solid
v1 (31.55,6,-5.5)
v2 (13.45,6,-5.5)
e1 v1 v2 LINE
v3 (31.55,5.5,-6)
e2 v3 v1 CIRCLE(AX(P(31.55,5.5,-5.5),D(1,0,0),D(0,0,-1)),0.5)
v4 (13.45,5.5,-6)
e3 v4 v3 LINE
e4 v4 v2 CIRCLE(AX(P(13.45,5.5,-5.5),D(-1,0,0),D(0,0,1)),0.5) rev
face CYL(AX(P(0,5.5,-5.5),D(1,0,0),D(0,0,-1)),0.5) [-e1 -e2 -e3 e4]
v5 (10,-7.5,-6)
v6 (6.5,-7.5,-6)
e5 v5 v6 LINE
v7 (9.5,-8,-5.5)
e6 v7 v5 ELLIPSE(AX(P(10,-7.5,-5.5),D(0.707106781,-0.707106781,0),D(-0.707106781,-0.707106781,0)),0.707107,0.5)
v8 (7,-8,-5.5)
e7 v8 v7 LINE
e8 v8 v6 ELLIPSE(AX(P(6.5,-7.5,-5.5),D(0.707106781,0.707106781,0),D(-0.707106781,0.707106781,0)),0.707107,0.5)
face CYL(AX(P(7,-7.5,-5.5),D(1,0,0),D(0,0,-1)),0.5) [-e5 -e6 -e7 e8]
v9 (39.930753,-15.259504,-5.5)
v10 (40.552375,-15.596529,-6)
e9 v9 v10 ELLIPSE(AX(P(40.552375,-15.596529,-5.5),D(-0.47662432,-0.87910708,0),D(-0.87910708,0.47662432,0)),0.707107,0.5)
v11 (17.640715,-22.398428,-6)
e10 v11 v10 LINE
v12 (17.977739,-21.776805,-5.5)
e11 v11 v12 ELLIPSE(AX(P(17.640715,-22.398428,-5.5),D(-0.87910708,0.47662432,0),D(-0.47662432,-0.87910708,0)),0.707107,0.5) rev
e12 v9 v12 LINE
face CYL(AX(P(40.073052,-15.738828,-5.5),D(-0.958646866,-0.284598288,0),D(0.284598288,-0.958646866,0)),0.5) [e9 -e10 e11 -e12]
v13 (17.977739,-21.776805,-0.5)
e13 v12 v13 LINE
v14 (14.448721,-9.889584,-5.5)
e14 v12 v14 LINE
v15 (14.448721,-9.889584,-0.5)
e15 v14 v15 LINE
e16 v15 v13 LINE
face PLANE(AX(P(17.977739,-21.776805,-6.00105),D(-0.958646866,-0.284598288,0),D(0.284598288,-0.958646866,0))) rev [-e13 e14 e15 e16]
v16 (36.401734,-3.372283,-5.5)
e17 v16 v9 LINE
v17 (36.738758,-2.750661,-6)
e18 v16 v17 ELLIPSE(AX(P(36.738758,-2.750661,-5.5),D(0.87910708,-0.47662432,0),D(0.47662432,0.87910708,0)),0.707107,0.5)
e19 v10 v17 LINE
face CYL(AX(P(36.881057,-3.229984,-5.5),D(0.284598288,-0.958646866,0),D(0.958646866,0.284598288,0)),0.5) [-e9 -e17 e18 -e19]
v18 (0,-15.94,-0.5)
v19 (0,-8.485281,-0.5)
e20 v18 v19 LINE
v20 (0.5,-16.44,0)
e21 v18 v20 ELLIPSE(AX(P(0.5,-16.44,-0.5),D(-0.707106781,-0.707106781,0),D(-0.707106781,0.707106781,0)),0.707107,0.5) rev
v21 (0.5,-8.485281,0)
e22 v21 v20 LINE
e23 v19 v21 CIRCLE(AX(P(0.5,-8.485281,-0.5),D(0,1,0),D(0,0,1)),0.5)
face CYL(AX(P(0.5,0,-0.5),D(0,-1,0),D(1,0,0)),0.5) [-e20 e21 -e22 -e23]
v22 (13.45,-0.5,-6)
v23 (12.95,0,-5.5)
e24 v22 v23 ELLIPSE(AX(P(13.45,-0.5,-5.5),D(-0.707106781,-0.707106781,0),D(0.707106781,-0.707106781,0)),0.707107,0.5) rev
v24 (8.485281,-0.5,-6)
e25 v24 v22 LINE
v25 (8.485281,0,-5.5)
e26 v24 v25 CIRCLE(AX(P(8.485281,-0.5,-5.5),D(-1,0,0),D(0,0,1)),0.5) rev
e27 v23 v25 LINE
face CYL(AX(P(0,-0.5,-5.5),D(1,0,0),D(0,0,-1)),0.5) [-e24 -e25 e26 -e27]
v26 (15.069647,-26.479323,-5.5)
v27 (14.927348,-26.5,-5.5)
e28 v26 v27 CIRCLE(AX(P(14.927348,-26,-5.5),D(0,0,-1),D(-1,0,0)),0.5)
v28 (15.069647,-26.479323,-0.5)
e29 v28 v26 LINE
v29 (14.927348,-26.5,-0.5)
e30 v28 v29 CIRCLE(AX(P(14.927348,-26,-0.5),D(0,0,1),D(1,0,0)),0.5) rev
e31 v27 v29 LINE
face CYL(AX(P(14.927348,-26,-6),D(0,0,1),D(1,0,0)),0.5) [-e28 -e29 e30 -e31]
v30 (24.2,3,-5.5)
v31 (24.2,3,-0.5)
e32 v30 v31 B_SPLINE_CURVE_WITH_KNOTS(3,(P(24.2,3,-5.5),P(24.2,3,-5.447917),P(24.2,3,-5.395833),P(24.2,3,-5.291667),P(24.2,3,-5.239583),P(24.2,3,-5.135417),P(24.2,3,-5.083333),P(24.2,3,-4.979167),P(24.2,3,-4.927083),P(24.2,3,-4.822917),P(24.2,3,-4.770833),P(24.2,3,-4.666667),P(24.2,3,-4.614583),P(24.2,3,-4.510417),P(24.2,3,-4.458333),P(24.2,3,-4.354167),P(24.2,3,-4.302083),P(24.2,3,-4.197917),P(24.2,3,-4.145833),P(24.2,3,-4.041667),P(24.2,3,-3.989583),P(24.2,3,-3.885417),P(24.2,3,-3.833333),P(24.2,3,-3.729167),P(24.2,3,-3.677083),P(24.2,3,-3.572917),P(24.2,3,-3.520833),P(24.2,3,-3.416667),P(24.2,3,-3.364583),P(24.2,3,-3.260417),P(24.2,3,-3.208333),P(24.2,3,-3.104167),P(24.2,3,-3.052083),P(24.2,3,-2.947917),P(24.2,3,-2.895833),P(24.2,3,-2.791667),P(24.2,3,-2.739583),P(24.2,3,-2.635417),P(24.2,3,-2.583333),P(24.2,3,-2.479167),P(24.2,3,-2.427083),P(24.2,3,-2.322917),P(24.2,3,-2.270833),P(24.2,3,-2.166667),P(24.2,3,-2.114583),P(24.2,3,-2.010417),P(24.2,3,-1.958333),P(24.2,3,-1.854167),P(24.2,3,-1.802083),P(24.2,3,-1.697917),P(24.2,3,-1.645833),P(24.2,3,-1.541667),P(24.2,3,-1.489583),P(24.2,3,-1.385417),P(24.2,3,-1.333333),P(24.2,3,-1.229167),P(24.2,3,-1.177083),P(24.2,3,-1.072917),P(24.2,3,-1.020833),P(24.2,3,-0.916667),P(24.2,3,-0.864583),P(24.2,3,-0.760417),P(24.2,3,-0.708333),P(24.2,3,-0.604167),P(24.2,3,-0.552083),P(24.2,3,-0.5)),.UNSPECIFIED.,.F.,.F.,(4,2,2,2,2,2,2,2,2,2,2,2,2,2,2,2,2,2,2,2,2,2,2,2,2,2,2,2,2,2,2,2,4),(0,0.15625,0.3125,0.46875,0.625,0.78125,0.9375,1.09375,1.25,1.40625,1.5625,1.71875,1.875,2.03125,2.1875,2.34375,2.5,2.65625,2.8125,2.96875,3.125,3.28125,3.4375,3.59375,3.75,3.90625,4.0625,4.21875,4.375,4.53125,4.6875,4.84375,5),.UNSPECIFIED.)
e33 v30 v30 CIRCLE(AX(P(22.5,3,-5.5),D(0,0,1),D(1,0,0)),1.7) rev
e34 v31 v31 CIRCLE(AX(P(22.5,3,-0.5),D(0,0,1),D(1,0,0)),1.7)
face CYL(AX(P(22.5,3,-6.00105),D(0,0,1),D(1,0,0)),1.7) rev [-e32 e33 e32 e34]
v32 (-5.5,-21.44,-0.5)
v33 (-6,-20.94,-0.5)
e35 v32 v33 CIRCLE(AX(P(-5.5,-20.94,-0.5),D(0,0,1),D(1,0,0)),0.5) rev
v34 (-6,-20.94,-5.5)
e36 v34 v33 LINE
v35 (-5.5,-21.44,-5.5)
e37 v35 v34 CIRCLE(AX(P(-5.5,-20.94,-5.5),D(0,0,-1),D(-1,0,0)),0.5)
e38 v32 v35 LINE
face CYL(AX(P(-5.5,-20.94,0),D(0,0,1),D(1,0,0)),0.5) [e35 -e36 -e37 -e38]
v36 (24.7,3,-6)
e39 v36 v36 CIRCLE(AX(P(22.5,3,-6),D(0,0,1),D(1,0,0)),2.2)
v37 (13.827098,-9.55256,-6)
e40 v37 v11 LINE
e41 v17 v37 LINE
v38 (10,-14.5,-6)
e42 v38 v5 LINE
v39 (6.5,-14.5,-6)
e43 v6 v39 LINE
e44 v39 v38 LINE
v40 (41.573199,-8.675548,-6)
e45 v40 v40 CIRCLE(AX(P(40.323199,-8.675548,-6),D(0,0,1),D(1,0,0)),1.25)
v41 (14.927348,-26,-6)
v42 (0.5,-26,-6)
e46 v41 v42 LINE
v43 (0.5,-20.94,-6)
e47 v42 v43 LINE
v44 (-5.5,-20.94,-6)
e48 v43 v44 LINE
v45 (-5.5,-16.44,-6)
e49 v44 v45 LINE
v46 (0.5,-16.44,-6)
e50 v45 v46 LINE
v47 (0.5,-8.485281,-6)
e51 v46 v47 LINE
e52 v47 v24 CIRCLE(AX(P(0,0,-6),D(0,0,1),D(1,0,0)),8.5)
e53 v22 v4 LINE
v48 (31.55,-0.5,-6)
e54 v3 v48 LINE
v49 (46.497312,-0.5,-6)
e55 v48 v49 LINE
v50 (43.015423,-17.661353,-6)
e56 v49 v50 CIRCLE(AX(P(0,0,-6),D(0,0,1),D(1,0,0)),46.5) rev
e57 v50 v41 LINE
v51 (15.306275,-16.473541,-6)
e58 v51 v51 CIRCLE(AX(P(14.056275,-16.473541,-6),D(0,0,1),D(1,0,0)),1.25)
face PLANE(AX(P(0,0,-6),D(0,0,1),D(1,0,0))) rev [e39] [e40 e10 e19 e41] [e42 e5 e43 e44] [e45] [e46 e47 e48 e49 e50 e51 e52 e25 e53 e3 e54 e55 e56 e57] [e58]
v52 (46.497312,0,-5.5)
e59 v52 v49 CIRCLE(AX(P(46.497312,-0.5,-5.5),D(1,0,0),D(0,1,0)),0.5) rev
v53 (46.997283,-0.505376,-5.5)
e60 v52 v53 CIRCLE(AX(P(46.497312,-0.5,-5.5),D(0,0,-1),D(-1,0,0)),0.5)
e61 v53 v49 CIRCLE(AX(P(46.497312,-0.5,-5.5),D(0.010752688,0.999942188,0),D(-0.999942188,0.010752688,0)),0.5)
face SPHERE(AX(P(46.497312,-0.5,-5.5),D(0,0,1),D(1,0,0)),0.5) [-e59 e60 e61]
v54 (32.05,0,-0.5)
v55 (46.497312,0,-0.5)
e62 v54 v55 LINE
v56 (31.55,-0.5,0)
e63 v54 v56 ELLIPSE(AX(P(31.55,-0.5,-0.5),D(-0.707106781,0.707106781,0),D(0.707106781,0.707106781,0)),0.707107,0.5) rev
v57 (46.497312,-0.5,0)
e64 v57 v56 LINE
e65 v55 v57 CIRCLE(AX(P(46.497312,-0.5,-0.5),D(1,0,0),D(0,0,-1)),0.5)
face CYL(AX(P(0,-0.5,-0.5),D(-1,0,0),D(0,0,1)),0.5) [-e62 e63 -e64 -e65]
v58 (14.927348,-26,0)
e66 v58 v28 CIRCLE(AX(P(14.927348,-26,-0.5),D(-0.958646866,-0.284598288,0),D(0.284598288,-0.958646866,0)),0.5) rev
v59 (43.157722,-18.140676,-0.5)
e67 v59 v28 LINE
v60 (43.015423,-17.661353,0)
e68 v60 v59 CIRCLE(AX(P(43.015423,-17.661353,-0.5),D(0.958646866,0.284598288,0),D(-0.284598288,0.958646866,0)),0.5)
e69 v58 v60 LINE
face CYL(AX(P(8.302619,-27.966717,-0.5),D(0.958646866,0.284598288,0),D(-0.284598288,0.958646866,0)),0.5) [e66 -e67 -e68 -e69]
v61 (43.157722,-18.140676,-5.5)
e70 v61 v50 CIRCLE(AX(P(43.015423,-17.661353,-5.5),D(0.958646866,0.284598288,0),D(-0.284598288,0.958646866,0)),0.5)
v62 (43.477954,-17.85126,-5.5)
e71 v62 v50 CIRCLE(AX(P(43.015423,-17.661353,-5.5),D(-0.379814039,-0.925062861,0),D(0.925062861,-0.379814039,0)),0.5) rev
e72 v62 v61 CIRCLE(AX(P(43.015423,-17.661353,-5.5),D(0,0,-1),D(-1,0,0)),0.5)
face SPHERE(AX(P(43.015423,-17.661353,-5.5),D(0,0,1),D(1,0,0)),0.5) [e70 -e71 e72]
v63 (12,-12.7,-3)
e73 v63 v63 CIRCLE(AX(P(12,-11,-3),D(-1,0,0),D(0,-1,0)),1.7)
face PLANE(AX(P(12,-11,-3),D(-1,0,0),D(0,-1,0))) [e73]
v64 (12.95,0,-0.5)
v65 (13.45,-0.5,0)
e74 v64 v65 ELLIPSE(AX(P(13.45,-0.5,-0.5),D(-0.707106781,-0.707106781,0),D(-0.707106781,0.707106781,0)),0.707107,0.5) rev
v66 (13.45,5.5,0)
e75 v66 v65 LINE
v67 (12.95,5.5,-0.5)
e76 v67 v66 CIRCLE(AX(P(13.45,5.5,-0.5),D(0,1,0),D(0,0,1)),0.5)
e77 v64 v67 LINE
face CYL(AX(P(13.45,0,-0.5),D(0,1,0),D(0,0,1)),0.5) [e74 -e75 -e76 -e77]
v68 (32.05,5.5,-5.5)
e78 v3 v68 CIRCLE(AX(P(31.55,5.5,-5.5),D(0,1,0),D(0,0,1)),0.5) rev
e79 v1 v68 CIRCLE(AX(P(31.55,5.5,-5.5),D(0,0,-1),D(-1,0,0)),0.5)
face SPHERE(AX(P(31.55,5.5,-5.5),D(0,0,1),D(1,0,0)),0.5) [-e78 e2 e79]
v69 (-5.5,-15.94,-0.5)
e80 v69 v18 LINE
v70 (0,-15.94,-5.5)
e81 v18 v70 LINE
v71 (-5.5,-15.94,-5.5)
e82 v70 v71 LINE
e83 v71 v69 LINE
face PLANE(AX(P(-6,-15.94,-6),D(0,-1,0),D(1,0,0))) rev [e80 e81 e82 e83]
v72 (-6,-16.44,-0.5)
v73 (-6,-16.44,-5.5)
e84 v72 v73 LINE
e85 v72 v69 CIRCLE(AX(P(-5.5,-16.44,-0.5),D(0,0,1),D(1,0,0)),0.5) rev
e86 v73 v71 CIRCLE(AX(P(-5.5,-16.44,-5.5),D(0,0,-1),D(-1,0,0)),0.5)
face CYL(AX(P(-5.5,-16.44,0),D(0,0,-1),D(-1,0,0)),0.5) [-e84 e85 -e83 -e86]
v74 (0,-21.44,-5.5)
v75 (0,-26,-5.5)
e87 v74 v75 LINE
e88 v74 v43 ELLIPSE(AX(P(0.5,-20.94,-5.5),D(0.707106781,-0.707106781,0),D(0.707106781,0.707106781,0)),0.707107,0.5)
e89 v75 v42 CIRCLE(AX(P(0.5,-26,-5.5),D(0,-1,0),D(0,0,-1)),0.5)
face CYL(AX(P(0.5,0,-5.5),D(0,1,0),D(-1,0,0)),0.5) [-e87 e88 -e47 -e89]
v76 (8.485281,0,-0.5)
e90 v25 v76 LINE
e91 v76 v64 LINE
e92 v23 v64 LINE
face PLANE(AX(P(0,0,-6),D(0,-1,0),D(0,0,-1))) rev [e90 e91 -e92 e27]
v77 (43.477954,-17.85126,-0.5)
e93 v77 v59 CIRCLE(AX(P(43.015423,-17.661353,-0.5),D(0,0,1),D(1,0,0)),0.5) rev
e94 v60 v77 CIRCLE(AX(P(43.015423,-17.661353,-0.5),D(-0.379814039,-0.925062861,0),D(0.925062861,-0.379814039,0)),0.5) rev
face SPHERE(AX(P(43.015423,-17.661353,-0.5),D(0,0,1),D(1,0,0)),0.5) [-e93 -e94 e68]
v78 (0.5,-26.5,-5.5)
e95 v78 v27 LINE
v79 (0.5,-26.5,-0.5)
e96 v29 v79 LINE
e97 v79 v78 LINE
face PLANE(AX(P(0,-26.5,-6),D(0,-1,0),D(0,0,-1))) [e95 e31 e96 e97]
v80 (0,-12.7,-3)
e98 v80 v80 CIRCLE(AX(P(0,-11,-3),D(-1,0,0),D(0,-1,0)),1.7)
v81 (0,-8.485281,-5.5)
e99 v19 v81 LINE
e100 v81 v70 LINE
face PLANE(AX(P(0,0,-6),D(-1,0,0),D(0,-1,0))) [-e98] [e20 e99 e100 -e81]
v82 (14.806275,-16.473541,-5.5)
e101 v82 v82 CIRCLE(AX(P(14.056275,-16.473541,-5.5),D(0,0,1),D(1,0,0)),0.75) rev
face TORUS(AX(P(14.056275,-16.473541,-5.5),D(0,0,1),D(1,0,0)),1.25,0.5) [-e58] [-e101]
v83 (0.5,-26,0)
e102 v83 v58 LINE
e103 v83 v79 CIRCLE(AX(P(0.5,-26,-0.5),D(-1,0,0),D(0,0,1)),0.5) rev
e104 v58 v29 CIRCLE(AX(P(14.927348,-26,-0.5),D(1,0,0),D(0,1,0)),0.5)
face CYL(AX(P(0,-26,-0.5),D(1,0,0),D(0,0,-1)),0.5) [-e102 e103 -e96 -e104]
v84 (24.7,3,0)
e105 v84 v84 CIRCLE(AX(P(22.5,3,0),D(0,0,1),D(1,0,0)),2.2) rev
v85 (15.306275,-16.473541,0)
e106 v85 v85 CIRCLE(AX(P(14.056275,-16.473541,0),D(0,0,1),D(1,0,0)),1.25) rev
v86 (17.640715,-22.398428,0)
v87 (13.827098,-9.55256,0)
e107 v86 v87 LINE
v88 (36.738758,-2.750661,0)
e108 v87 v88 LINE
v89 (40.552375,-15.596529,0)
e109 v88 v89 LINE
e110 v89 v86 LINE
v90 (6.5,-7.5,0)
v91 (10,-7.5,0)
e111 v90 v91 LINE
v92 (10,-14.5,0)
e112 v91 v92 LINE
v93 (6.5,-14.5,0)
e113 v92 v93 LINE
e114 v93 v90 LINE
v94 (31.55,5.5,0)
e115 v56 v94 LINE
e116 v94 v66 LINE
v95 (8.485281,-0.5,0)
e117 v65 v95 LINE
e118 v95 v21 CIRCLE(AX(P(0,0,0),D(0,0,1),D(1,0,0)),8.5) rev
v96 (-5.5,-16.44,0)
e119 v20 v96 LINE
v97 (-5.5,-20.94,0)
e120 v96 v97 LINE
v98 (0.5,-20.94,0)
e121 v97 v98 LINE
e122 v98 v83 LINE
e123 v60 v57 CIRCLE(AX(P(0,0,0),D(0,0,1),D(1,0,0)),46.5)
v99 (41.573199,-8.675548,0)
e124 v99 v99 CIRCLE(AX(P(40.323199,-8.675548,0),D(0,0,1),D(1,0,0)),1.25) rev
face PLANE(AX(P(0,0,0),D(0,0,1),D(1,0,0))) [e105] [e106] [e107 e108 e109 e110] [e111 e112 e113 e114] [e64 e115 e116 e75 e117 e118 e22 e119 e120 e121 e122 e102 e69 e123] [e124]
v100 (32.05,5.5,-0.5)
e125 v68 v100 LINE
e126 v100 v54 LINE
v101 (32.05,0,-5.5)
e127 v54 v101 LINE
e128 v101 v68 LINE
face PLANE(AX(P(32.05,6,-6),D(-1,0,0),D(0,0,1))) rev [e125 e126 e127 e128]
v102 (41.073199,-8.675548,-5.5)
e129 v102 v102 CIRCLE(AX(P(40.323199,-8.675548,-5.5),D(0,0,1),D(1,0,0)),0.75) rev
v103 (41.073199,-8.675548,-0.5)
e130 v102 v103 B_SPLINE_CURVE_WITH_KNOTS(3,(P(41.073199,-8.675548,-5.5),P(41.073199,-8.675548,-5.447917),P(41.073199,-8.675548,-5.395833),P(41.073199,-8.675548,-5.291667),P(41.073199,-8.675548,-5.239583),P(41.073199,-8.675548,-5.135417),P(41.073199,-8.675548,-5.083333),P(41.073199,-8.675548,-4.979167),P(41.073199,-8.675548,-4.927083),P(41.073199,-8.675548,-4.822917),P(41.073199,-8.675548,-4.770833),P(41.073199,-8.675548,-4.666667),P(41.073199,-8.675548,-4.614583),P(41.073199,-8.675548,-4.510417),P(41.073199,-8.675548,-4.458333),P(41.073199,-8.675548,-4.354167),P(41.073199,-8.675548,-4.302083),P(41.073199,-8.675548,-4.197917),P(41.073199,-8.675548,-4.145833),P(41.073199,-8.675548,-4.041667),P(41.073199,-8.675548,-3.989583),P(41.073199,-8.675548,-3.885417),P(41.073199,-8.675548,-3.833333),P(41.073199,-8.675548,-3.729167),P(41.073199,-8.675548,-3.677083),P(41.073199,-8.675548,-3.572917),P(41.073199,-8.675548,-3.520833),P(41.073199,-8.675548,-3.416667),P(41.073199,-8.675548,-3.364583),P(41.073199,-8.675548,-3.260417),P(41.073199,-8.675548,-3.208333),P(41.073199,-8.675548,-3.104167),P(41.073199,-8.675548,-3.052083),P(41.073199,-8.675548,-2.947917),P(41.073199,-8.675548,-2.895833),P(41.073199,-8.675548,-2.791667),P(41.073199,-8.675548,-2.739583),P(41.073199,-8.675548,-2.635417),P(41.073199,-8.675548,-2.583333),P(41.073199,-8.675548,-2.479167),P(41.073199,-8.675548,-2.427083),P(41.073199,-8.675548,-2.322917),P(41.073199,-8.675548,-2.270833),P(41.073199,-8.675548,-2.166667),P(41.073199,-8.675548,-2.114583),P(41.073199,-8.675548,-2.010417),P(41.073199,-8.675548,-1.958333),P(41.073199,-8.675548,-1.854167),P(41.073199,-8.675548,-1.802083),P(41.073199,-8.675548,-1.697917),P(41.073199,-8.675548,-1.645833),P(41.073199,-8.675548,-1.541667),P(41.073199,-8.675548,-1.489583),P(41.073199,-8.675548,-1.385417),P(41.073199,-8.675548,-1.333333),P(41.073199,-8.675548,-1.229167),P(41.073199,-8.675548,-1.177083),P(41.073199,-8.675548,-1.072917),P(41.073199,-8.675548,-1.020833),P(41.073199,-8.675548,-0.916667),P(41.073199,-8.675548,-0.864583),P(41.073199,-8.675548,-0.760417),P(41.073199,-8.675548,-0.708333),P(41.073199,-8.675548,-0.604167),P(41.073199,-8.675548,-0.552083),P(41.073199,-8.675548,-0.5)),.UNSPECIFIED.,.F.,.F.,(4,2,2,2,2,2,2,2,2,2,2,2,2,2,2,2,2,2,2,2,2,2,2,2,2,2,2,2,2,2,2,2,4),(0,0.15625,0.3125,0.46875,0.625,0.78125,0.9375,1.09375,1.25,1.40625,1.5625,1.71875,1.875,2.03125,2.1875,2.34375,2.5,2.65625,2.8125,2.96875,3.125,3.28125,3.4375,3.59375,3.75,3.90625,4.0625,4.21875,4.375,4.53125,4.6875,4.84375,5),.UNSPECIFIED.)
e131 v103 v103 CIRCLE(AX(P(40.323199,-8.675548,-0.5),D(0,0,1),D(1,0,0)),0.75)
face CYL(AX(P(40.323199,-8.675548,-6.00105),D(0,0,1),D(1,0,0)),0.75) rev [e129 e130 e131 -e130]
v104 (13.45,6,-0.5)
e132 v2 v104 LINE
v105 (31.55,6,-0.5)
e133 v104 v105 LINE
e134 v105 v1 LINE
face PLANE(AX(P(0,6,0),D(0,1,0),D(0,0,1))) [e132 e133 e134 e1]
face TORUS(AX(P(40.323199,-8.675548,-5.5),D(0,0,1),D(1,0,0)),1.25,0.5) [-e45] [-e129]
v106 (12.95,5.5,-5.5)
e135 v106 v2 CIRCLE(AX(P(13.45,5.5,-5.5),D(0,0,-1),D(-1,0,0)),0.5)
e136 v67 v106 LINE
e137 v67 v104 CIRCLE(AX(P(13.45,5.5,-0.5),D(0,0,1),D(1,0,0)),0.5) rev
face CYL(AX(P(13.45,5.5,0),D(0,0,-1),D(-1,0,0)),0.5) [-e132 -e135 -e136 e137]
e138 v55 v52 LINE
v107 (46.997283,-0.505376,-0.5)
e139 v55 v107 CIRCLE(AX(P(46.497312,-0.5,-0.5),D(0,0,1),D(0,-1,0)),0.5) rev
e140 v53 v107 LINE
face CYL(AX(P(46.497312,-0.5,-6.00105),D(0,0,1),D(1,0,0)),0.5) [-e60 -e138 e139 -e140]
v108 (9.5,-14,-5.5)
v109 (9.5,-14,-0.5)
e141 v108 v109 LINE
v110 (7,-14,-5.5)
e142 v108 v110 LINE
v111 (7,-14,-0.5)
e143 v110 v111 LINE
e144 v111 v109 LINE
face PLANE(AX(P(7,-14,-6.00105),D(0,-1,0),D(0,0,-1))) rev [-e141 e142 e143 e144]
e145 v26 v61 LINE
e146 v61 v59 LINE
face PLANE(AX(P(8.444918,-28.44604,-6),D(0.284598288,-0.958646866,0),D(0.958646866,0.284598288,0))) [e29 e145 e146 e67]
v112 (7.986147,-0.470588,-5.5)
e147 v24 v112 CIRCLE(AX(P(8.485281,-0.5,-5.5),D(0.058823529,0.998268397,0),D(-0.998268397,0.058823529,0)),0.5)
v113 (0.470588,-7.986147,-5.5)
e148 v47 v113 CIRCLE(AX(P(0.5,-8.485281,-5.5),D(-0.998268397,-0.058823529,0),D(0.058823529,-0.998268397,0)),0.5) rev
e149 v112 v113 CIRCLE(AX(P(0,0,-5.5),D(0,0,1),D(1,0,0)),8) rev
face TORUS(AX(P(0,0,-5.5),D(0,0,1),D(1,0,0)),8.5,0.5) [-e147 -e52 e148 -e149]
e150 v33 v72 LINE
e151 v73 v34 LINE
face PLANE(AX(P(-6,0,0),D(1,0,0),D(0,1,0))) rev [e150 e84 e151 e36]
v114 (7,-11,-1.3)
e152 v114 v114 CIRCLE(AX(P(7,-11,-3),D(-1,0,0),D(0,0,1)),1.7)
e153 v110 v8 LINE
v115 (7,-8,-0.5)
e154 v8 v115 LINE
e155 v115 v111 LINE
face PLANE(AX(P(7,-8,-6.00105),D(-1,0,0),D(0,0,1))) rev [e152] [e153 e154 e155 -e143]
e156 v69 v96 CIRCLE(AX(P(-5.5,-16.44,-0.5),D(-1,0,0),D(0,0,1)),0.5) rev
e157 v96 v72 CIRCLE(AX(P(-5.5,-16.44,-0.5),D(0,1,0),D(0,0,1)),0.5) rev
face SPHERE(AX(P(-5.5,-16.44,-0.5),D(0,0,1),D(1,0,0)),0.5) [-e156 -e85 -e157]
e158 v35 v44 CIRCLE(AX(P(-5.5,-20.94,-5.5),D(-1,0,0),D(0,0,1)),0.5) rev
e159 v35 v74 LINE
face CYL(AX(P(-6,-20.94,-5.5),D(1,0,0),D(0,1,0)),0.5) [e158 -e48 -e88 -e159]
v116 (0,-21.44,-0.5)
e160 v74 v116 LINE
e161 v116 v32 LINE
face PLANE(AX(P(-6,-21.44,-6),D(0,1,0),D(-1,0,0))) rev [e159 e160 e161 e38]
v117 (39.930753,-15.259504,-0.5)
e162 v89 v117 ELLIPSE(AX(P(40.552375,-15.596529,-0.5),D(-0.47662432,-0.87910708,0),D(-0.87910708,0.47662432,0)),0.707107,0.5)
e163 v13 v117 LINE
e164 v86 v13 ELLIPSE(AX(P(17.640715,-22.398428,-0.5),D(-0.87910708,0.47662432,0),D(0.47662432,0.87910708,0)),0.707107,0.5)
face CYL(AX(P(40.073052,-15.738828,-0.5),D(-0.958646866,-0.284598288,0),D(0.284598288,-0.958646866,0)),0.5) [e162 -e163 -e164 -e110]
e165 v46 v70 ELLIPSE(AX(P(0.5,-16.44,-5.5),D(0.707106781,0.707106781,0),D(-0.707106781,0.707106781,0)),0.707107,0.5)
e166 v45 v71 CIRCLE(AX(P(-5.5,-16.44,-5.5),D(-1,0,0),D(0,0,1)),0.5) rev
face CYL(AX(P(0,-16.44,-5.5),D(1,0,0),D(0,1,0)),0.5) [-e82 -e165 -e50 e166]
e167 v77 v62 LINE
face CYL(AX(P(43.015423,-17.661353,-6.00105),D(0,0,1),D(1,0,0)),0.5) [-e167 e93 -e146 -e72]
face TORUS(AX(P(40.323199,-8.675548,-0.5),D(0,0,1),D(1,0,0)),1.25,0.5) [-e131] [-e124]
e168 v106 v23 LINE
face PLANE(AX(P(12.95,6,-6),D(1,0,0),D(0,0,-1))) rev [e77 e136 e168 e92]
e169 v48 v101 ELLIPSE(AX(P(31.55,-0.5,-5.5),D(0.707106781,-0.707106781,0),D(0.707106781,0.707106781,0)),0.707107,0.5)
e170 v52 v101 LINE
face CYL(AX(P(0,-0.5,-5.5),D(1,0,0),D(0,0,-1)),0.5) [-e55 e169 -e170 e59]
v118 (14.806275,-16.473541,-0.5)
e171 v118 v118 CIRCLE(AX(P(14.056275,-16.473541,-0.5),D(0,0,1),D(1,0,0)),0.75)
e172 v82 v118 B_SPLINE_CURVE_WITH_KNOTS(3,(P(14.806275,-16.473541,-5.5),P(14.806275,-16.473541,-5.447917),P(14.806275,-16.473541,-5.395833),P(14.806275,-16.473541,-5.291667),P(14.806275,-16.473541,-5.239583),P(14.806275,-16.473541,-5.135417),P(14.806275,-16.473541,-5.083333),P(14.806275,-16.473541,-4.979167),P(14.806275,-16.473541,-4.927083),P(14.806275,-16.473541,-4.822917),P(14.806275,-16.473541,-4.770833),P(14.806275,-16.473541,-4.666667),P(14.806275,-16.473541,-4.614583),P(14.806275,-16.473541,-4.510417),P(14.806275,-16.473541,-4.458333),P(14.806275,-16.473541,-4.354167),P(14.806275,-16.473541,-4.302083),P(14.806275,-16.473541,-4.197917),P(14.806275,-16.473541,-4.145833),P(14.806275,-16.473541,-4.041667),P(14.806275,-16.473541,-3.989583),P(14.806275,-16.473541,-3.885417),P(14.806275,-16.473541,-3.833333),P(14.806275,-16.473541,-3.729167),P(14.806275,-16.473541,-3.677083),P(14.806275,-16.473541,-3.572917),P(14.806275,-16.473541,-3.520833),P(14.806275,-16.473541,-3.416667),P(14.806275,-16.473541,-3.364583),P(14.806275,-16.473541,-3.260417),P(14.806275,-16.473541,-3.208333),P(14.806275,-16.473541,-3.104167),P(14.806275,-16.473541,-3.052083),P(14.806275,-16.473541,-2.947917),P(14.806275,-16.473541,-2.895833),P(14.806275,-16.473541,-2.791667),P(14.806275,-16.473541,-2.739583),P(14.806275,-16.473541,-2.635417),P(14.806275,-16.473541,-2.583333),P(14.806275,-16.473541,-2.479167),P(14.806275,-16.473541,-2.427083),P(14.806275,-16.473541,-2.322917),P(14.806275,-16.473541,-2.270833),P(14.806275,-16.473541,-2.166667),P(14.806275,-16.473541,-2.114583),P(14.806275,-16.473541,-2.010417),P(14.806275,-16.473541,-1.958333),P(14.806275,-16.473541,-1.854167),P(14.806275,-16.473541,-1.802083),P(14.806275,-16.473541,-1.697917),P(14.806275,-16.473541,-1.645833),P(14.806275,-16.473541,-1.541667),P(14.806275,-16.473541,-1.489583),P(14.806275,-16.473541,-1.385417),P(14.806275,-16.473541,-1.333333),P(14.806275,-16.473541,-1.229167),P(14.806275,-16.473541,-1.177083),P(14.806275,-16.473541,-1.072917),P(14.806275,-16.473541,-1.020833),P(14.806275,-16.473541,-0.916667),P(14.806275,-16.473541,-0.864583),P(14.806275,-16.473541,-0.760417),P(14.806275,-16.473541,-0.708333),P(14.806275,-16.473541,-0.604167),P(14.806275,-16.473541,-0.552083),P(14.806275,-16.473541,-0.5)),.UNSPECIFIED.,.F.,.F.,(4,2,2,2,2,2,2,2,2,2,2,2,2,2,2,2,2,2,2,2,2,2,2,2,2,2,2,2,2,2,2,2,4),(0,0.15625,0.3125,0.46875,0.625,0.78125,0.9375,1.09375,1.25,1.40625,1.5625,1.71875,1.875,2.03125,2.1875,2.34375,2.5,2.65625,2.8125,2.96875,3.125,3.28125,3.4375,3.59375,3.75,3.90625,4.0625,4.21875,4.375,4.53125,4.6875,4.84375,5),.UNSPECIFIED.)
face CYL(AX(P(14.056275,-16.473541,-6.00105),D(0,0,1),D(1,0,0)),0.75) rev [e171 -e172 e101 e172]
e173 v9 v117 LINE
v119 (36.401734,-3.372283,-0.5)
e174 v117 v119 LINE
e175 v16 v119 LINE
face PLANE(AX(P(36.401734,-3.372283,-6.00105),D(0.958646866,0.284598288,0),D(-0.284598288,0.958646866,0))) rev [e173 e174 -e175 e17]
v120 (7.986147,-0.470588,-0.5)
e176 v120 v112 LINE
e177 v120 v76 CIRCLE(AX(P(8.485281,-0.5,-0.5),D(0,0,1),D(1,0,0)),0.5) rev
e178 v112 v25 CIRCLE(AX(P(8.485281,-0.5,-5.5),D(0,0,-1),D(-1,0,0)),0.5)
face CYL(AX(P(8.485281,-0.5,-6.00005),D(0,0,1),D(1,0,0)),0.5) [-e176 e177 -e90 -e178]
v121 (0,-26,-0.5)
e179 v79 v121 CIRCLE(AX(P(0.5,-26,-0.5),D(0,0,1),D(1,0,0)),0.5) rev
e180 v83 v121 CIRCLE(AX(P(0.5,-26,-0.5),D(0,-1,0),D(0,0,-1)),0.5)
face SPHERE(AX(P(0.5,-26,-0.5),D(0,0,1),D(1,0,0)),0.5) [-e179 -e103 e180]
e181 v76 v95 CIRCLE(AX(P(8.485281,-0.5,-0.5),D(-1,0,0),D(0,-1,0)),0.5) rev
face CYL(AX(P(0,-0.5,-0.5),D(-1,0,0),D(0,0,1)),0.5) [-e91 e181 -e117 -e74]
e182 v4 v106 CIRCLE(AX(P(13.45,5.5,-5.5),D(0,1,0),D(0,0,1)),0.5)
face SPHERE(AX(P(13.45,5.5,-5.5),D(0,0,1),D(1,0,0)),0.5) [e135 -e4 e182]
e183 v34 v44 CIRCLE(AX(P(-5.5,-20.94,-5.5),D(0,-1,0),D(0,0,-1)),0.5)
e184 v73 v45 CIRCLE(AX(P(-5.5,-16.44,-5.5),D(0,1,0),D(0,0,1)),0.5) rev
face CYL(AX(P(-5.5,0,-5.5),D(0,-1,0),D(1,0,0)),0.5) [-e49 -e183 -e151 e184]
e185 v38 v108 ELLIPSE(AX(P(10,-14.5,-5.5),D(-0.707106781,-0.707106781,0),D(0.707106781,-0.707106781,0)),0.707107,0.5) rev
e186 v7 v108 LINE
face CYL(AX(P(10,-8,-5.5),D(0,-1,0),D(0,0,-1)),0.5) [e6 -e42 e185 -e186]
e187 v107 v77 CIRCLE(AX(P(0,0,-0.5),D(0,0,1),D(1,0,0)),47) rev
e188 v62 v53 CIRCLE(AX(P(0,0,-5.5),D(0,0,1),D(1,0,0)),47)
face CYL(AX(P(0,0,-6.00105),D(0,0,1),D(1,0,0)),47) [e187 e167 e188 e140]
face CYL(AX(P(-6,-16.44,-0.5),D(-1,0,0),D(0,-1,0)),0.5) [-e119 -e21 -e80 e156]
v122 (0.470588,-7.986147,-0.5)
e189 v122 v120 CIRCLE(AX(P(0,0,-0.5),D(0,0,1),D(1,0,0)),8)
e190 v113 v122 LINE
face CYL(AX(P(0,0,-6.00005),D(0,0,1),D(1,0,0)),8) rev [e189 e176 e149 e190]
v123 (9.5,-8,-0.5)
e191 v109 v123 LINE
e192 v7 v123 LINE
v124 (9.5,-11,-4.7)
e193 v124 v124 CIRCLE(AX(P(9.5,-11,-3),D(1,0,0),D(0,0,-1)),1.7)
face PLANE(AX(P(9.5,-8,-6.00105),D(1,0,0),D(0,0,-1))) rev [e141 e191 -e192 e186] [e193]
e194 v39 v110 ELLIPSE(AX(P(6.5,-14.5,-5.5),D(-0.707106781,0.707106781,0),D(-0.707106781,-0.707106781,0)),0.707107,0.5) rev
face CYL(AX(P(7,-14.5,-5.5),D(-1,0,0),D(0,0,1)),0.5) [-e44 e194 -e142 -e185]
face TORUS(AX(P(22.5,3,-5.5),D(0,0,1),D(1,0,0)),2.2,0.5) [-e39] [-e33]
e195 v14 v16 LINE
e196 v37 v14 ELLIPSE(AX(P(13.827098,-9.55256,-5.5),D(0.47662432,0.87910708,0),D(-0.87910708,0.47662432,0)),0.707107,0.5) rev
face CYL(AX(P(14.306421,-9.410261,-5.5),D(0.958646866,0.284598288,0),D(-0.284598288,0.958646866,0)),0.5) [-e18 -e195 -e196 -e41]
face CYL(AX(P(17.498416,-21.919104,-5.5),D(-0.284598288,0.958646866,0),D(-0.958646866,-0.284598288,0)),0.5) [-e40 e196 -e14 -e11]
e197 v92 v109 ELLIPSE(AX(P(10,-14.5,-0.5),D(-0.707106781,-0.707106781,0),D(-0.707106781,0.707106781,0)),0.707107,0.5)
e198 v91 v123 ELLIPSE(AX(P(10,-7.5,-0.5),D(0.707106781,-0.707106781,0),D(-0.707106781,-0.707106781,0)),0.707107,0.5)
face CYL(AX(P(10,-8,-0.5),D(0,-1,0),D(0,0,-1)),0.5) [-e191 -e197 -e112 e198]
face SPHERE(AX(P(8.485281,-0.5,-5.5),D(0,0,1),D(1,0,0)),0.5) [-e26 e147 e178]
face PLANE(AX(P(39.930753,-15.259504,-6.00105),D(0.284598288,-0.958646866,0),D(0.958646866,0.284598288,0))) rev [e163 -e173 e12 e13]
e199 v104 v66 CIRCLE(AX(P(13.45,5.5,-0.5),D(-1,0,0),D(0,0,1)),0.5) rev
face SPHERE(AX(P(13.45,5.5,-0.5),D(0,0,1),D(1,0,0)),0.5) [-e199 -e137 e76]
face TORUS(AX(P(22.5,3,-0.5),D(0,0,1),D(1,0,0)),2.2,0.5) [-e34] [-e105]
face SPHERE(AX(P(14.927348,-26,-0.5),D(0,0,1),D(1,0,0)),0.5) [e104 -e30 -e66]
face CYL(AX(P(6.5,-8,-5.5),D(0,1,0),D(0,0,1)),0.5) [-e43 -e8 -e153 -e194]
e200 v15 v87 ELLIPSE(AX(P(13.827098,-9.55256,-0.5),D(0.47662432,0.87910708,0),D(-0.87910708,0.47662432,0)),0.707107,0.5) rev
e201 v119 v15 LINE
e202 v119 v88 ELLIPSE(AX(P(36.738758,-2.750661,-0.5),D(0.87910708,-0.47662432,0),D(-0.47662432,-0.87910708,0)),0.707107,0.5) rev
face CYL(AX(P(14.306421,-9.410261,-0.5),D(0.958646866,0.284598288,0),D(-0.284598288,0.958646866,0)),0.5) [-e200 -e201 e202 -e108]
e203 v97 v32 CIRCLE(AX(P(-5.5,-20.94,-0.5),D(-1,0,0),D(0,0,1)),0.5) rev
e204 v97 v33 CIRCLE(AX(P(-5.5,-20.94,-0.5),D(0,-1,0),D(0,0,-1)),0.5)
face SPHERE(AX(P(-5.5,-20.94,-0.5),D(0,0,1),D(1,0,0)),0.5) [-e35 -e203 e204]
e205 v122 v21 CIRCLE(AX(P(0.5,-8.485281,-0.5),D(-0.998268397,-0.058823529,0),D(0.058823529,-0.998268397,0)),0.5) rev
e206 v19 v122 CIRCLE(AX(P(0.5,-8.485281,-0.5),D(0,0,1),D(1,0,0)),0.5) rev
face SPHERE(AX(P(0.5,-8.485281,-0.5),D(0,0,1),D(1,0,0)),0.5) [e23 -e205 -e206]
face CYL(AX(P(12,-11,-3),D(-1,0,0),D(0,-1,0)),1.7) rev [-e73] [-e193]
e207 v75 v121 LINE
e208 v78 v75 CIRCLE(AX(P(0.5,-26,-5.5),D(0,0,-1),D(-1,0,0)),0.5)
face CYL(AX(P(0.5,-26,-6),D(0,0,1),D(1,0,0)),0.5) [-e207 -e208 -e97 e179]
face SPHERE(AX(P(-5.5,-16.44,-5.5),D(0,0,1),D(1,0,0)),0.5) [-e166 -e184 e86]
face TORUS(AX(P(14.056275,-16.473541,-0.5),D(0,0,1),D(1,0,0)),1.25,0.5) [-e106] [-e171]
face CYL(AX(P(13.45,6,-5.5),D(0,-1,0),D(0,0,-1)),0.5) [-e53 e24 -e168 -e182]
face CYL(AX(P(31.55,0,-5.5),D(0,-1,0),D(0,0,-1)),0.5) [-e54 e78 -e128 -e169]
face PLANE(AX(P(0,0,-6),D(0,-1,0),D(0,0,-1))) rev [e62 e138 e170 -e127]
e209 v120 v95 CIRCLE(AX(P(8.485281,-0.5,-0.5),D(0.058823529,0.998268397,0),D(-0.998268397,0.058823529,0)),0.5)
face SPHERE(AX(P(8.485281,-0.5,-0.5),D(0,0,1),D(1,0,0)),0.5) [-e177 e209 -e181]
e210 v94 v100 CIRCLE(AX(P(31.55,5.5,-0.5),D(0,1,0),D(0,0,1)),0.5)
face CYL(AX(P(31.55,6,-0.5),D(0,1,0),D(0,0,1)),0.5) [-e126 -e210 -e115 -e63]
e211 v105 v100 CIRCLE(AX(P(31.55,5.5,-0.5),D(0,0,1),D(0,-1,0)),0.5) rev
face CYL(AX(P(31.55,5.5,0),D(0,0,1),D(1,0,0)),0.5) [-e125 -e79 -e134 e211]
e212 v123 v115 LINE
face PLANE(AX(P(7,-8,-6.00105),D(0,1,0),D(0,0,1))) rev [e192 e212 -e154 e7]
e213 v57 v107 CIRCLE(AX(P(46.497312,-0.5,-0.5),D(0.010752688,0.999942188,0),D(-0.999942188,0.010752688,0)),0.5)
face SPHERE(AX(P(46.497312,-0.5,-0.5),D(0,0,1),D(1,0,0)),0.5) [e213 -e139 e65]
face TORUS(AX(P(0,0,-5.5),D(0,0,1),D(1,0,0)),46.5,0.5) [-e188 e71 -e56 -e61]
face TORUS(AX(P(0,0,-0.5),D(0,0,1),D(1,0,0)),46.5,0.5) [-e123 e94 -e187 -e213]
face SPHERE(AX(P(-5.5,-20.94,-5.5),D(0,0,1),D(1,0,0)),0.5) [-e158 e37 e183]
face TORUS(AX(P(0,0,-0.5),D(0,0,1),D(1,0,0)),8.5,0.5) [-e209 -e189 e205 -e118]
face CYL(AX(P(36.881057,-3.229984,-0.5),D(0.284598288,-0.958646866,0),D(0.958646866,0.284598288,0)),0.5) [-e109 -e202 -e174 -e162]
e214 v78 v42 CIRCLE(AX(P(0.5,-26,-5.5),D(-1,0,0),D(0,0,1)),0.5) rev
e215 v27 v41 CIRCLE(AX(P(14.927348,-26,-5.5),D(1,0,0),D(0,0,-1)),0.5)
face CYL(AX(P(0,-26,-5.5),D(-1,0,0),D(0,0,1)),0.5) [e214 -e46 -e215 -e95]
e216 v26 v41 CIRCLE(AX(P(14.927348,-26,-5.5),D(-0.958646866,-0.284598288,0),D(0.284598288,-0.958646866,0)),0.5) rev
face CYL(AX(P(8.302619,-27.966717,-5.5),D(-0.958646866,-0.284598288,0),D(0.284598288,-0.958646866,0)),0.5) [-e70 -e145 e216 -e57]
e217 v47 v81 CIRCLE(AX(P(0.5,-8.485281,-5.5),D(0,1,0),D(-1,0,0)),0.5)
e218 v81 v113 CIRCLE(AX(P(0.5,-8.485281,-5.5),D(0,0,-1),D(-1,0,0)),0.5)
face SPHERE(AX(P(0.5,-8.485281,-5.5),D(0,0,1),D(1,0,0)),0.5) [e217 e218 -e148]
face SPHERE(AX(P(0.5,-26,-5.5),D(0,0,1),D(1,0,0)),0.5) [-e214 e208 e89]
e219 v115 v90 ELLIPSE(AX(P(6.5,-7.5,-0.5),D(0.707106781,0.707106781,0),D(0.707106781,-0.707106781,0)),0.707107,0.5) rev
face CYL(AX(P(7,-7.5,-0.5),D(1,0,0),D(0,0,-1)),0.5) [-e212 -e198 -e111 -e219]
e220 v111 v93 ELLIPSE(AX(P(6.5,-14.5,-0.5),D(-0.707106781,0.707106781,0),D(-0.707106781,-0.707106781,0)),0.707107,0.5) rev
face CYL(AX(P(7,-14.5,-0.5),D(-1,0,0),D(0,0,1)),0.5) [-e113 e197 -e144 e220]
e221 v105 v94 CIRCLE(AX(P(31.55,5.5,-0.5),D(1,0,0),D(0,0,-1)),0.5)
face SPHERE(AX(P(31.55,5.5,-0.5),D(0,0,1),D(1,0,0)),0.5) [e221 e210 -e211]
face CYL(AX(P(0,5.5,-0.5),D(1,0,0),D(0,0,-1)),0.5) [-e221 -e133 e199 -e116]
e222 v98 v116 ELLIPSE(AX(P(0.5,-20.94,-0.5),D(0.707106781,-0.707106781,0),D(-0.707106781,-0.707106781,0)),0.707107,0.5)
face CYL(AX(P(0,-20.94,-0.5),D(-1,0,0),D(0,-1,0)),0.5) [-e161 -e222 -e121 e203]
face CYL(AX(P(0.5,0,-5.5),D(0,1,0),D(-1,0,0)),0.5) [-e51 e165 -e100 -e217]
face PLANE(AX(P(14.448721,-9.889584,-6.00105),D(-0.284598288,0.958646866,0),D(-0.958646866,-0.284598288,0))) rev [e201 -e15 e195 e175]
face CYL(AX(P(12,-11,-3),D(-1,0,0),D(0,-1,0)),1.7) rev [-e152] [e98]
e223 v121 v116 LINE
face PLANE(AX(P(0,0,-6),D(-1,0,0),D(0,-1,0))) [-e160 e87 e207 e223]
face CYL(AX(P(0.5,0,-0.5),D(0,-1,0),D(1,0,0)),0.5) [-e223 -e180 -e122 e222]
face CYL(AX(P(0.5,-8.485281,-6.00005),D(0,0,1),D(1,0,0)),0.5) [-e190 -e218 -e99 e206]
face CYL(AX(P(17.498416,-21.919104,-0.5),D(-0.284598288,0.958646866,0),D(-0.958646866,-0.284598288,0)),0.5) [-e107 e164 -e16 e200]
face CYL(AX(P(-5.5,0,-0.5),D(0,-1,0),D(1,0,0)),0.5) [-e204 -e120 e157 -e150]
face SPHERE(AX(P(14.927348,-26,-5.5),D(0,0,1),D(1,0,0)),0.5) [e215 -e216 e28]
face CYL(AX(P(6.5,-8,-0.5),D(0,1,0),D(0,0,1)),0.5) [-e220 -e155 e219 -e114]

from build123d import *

# Parameters (mm, degrees)
BODY_DEPTH                = 6
SKETCH2_W                 = 19.1
SKETCH2_H                 = 6
TOP_TAB_DEPTH             = 6
SKETCH3_W                 = 6
SKETCH3_H                 = 5.5
BACK_TAB_DEPTH            = 6
SKETCH5_R                 = 1.7
BACK_SCREW_HOLE_DEPTH     = 12
SCREW_AND_NUT_HOLES_REACH = 56.289
SKETCH4_R                 = 1.7
SKETCH4_W                 = 2.5
SKETCH4_H                 = 6
SKETCH7_R                 = 8
SWITCH_WIRE_RELIEF_DEPTH  = 55.288580751
ROUNDED_START             = -6
ROUNDED_CORNER_OUTLINE_R  = 0.75
ROUNDED_CORNER_DEPTH      = 6
FILLET1_R                 = 0.5


# Read off the part's stored shape, not the designer's step: Rounded Corner
with BuildPart() as part:
    # Sketch1 → Body (new body)
    with BuildSketch(Plane.XY):
        Polygon((0, -26.5), (15, -26.5), (47, -17), (47, 0), (0, 0), align=None)
    extrude(amount=-BODY_DEPTH)

    # Sketch2 → Top Tab (add)
    with BuildSketch(Plane(origin=(0, 0, 0), x_dir=(1, 0, 0), z_dir=(0, 1, 0))):
        with Locations((22.5, 3)):
            Rectangle(SKETCH2_W, SKETCH2_H)
    extrude(amount=TOP_TAB_DEPTH)

    # Sketch3 → Back Tab (add)
    with BuildSketch(Plane.ZY):
        with Locations((-3, -18.69)):
            Rectangle(SKETCH3_W, SKETCH3_H)
    extrude(amount=BACK_TAB_DEPTH)

    # Sketch5 → Back Screw Hole (cut)
    with BuildSketch(Plane.ZY):
        with Locations(Location((-3, -11, 0), (0, 0, 270))):
            Circle(SKETCH5_R)
    extrude(amount=-BACK_SCREW_HOLE_DEPTH, mode=Mode.SUBTRACT)

    # Sketch4 → Screw and Nut Holes (cut, up to next)
    with BuildSketch(Plane.XY, mode=Mode.PRIVATE) as screw_and_nut_holes_sk1:
        with Locations((22.5, 3)):
            Circle(SKETCH4_R)
    screw_and_nut_holes_tool1 = extrude(screw_and_nut_holes_sk1.sketch, amount=-SCREW_AND_NUT_HOLES_REACH, mode=Mode.PRIVATE) & part.part
    # Sketch4 → Screw and Nut Holes (cut, up to next)
    with BuildSketch(Plane.XY, mode=Mode.PRIVATE) as screw_and_nut_holes_sk2:
        with Locations((8.25, -11)):
            Rectangle(SKETCH4_W, SKETCH4_H)
    screw_and_nut_holes_tool2 = extrude(screw_and_nut_holes_sk2.sketch, amount=-SCREW_AND_NUT_HOLES_REACH, mode=Mode.PRIVATE) & part.part
    add(screw_and_nut_holes_tool1.solids().sort_by_distance((22.5, 3, 0))[0], mode=Mode.SUBTRACT)
    add(screw_and_nut_holes_tool2.solids().sort_by_distance((8.25, -11, 0))[0], mode=Mode.SUBTRACT)

    # Sketch7 → Switch Wire Relief (cut, through all)
    with BuildSketch(Plane.XY):
        Circle(SKETCH7_R)
    extrude(amount=-SWITCH_WIRE_RELIEF_DEPTH, mode=Mode.SUBTRACT)

    # Rounded Corner outline → Rounded Corner (cut)
    with BuildSketch(Plane.XY.offset(ROUNDED_START)):
        Polygon((39.930752628, -15.259504453), (36.401733852, -3.372283311), (14.448720614, -9.889584116), (17.97773939, -21.776805258), align=None)
        with Locations((14.056274553, -16.473540836)):
            Circle(ROUNDED_CORNER_OUTLINE_R)
        with Locations((40.323198689, -8.675547733)):
            Circle(ROUNDED_CORNER_OUTLINE_R)
        with BuildLine():
            ThreePointArc((47, 0), (46.087728798, -9.215272882), (43.386329605, -18.072808399))
            Line((43.386329605, -18.072808399), (47, -17))
            Line((47, -17), (47, 0))
        make_face()
    extrude(amount=ROUNDED_CORNER_DEPTH, mode=Mode.SUBTRACT)

    # Fillet1
    fillet1_edges = [part.edges().sort_by_distance(p)[0] for p in [
        (39.525, 0, -6),
        (32.05, 3, -6),
        (22.5, 6, -6),
        (12.95, 3, -6),
        (10.475, 0, -6),
        (5.656854249, -5.656854249, -6),
        (0, -11.97, -6),
        (-3, -15.94, -6),
        (-6, -18.69, -6),
        (-3, -21.44, -6),
        (0, -23.97, -6),
        (7.5, -26.5, -6),
        (29.193164802, -22.286404199, -6),
        (39.573198689, -8.675547733, -6),
        (13.306274553, -16.473540836, -6),
        (28.954246009, -18.518154856, -6),
        (16.213230002, -15.833194687, -6),
        (25.425227233, -6.630933713, -6),
        (38.16624324, -9.315893882, -6),
        (9.5, -11, -6),
        (8.25, -14, -6),
        (7, -11, -6),
        (8.25, -8, -6),
        (20.8, 3, -6),
        (7.5, -26.5, 0),
        (0, -23.97, 0),
        (-3, -21.44, 0),
        (-6, -18.69, 0),
        (-3, -15.94, 0),
        (0, -11.97, 0),
        (5.656854249, -5.656854249, 0),
        (10.475, 0, 0),
        (12.95, 3, 0),
        (22.5, 6, 0),
        (32.05, 3, 0),
        (39.525, 0, 0),
        (29.193164802, -22.286404199, 0),
        (39.573198689, -8.675547733, 0),
        (13.306274553, -16.473540836, 0),
        (16.213230002, -15.833194687, 0),
        (28.954246009, -18.518154856, 0),
        (38.16624324, -9.315893882, 0),
        (25.425227233, -6.630933713, 0),
        (8.25, -14, 0),
        (9.5, -11, 0),
        (8.25, -8, 0),
        (7, -11, 0),
        (20.8, 3, 0),
        (15, -26.5, -3),
        (0, -26.5, -3),
        (-6, -21.44, -3),
        (-6, -15.94, -3),
        (0, -8, -3),
        (8, 0, -3),
        (12.95, 6, -3),
        (32.05, 6, -3),
        (46.087728798, -9.215272882, -6),
        (46.087728798, -9.215272882, 0),
        (43.386329605, -18.072808399, -3),
        (47, 0, -3),
    ]]
    fillet(fillet1_edges, radius=FILLET1_R)


solid = part.part
